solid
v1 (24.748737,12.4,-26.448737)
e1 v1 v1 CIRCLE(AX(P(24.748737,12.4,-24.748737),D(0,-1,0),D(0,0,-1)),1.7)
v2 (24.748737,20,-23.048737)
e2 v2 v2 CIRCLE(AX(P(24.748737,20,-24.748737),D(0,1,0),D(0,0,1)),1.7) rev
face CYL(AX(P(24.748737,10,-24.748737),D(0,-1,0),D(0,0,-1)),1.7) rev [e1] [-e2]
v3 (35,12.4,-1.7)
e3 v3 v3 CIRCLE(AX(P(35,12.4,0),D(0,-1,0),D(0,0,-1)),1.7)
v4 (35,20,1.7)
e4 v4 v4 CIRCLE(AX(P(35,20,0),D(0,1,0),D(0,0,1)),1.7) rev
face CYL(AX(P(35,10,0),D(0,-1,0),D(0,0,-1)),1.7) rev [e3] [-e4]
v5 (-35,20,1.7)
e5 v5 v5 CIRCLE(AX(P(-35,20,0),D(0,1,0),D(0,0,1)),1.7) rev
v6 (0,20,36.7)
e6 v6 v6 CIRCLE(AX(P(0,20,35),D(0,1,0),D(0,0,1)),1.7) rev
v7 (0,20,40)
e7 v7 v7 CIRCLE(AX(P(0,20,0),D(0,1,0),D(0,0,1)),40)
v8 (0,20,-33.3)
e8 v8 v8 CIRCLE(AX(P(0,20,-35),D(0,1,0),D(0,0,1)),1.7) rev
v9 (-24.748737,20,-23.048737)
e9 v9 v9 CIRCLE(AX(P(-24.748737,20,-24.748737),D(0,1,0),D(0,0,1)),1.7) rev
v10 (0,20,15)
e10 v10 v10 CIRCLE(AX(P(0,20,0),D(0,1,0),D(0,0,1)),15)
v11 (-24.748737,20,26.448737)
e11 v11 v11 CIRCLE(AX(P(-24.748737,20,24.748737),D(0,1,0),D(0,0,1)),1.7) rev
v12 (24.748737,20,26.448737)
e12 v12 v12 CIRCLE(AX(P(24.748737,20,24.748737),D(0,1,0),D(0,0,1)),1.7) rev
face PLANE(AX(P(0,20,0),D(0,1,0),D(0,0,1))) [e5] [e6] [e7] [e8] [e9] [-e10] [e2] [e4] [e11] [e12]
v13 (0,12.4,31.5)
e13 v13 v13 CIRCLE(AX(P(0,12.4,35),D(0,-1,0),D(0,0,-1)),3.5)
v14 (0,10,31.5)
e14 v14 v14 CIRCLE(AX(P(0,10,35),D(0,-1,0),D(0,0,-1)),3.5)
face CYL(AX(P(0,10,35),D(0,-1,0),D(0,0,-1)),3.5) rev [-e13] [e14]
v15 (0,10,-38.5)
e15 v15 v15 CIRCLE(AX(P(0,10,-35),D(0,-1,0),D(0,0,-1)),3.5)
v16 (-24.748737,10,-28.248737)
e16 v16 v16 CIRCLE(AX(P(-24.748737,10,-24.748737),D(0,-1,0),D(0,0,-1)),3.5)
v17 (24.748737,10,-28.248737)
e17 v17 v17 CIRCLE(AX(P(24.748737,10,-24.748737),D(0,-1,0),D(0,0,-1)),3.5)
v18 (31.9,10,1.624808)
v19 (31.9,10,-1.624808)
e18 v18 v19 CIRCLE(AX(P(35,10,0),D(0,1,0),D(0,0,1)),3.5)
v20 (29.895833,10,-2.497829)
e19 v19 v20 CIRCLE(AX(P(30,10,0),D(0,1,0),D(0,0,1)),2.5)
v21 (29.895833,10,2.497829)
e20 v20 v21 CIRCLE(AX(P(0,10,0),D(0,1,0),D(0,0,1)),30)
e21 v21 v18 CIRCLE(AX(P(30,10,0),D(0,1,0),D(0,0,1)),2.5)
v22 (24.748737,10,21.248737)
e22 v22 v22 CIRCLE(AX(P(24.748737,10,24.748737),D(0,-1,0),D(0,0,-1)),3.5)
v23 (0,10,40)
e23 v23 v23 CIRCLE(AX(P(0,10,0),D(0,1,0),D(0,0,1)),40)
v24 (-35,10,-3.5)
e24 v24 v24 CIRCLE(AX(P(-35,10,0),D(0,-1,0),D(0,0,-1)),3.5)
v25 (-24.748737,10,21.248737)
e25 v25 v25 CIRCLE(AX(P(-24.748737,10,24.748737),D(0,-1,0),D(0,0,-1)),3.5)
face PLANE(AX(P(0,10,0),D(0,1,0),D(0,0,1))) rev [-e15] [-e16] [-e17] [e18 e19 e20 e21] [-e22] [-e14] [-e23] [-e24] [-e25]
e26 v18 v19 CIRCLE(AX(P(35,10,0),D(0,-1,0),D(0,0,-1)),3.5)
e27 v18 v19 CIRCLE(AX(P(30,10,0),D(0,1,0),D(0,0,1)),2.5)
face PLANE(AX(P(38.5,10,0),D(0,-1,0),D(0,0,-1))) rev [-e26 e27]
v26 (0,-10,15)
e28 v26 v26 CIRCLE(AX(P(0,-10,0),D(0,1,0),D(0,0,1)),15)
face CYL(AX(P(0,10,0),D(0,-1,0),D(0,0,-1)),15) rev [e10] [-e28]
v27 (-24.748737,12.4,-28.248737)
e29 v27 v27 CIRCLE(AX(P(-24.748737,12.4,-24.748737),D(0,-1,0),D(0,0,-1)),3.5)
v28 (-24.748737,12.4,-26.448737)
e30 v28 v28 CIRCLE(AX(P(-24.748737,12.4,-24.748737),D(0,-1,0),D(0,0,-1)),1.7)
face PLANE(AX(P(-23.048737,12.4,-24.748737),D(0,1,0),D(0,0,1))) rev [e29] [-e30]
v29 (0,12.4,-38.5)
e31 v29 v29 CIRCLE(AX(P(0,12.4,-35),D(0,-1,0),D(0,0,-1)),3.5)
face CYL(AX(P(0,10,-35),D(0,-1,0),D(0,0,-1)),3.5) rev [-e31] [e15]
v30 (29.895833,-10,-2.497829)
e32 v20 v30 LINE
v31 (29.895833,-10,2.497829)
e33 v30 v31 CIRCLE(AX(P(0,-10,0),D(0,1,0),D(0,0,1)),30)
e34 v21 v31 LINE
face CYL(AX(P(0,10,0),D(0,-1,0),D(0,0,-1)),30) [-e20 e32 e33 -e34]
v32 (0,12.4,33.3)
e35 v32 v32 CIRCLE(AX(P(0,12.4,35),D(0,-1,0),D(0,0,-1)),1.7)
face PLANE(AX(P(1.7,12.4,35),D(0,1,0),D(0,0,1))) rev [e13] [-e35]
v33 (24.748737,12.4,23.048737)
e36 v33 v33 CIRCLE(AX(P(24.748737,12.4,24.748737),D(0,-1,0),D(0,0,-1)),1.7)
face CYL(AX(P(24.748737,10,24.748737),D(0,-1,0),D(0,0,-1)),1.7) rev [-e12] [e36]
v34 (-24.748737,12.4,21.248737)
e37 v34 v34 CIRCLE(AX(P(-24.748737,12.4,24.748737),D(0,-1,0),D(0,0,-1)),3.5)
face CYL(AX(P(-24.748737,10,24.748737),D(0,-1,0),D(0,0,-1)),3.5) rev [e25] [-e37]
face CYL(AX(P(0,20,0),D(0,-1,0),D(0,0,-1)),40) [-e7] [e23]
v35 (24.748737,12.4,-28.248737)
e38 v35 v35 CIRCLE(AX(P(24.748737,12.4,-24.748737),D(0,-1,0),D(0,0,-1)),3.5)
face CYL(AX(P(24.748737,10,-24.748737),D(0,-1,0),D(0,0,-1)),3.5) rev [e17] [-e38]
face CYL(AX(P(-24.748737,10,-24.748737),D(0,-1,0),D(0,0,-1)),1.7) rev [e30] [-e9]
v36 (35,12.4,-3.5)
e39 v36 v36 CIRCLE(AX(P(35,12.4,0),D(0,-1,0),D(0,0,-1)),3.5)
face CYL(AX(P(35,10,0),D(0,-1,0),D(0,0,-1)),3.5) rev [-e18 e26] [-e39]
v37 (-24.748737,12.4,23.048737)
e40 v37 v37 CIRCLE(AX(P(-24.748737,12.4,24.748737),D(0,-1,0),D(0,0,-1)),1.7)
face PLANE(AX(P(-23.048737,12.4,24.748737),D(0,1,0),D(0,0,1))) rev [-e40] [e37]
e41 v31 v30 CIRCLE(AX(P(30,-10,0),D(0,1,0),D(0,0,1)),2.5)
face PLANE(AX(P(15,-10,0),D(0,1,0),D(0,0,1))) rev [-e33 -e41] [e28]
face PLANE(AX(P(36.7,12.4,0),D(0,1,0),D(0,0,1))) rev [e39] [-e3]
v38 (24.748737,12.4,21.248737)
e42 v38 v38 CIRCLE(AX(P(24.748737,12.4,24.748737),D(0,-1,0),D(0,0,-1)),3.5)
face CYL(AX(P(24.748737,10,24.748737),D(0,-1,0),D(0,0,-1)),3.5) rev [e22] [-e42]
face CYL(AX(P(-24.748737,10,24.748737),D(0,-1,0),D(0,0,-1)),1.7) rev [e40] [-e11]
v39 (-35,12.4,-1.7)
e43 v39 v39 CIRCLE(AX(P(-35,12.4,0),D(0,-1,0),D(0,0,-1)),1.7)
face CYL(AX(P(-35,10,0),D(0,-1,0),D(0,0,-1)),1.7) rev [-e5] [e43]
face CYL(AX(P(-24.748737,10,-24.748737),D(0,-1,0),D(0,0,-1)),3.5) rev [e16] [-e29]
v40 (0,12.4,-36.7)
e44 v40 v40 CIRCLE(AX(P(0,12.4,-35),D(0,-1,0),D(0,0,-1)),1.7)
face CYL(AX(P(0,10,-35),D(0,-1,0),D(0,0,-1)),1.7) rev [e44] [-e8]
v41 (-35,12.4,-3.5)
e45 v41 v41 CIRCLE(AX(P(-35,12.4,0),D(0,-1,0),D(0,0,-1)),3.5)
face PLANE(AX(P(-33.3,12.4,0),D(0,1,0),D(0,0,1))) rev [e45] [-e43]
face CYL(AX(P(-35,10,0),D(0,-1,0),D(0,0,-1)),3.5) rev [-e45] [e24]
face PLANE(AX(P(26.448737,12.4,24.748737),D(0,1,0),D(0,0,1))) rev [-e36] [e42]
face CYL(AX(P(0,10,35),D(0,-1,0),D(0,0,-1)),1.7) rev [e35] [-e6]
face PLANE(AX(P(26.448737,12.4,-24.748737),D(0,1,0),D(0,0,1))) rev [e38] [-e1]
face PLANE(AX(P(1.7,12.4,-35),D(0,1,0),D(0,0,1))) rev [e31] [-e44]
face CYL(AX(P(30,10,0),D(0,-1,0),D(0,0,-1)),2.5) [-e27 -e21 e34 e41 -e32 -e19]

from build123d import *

# Parameters (mm, degrees)
CROQUIS1_R                                     = 15
SALIENTE_EXTRUIR1_DEPTH                        = 10
CROQUIS2_R                                     = 40
CROQUIS2_R_2                                   = 15
SALIENTE_EXTRUIR2_DEPTH                        = 10
REFRENTADO_START                               = 10
REFRENTADO_PARA_TORNILLO_CON_CABEZA_2_R        = 3.5
REFRENTADO_PARA_TORNILLO_CON_CABEZA_TRON_DEPTH = 2.4
REFRENTADO_START_2                             = 12.4
REFRENTADO_PARA_TORNILLO_CON_CABEZA_3_OU_R     = 1.7
REFRENTADO_PARA_TORNILLO_CON_CABEZA_3_DEPTH    = 7.6


# Read off the part's stored shape, not the designer's step: Refrentado para tornillo con cabeza troncocónica de M31
with BuildPart() as part:
    # Croquis1 → Saliente-Extruir1 (new, symmetric)
    with BuildSketch(Plane(origin=(0, 0, 0), x_dir=(1, 0, 0), z_dir=(0, 1, 0))):
        with BuildLine():
            ThreePointArc((29.895833333, 2.497828918), (-30, 0), (29.895833333, -2.497828918))
            ThreePointArc((29.895833333, -2.497828918), (32.5, 0), (29.895833333, 2.497828918))
        make_face()
        with Locations(Location((0, 0, 0), (0, 0, 270))):
            Circle(CROQUIS1_R, mode=Mode.SUBTRACT)
    extrude(amount=SALIENTE_EXTRUIR1_DEPTH, both=True)

    # Croquis2 → Saliente-Extruir2 (add)
    with BuildSketch(Plane(origin=(0, 10, 0), x_dir=(1, 0, 0), z_dir=(0, 1, 0))):
        with Locations(Location((0, 0, 0), (0, 0, 270))):
            Circle(CROQUIS2_R)
        with Locations(Location((0, 0, 0), (0, 0, 270))):
            Circle(CROQUIS2_R_2, mode=Mode.SUBTRACT)
    extrude(amount=SALIENTE_EXTRUIR2_DEPTH)

    # Refrentado para tornillo con cabeza  2 → Refrentado para tornillo con cabeza troncocónica de M31 (cut)
    with BuildSketch(Plane(origin=(0, 0, 0), x_dir=(1, 0, 0), z_dir=(0, 1, 0)).offset(REFRENTADO_START)):
        with Locations((-24.748737342, -24.748737342)):
            Circle(REFRENTADO_PARA_TORNILLO_CON_CABEZA_2_R)
        with Locations((-35, 0)):
            Circle(REFRENTADO_PARA_TORNILLO_CON_CABEZA_2_R)
        with Locations((-24.748737342, 24.748737342)):
            Circle(REFRENTADO_PARA_TORNILLO_CON_CABEZA_2_R)
        with Locations((0, 35)):
            Circle(REFRENTADO_PARA_TORNILLO_CON_CABEZA_2_R)
        with Locations((24.748737342, 24.748737342)):
            Circle(REFRENTADO_PARA_TORNILLO_CON_CABEZA_2_R)
        with Locations((35, 0)):
            Circle(REFRENTADO_PARA_TORNILLO_CON_CABEZA_2_R)
        with Locations((24.748737342, -24.748737342)):
            Circle(REFRENTADO_PARA_TORNILLO_CON_CABEZA_2_R)
        with Locations((0, -35)):
            Circle(REFRENTADO_PARA_TORNILLO_CON_CABEZA_2_R)
    extrude(amount=REFRENTADO_PARA_TORNILLO_CON_CABEZA_TRON_DEPTH, mode=Mode.SUBTRACT)

    # Refrentado para tornillo con cabeza 3 ou → Refrentado para tornillo con cabeza  3 (cut)
    with BuildSketch(Plane(origin=(0, 0, 0), x_dir=(1, 0, 0), z_dir=(0, 1, 0)).offset(REFRENTADO_START_2)):
        with Locations((-24.748737342, -24.748737342)):
            Circle(REFRENTADO_PARA_TORNILLO_CON_CABEZA_3_OU_R)
        with Locations((-35, 0)):
            Circle(REFRENTADO_PARA_TORNILLO_CON_CABEZA_3_OU_R)
        with Locations((-24.748737342, 24.748737342)):
            Circle(REFRENTADO_PARA_TORNILLO_CON_CABEZA_3_OU_R)
        with Locations((0, 35)):
            Circle(REFRENTADO_PARA_TORNILLO_CON_CABEZA_3_OU_R)
        with Locations((24.748737342, 24.748737342)):
            Circle(REFRENTADO_PARA_TORNILLO_CON_CABEZA_3_OU_R)
        with Locations((35, 0)):
            Circle(REFRENTADO_PARA_TORNILLO_CON_CABEZA_3_OU_R)
        with Locations((24.748737342, -24.748737342)):
            Circle(REFRENTADO_PARA_TORNILLO_CON_CABEZA_3_OU_R)
        with Locations((0, -35)):
            Circle(REFRENTADO_PARA_TORNILLO_CON_CABEZA_3_OU_R)
    extrude(amount=REFRENTADO_PARA_TORNILLO_CON_CABEZA_3_DEPTH, mode=Mode.SUBTRACT)


solid = part.part
